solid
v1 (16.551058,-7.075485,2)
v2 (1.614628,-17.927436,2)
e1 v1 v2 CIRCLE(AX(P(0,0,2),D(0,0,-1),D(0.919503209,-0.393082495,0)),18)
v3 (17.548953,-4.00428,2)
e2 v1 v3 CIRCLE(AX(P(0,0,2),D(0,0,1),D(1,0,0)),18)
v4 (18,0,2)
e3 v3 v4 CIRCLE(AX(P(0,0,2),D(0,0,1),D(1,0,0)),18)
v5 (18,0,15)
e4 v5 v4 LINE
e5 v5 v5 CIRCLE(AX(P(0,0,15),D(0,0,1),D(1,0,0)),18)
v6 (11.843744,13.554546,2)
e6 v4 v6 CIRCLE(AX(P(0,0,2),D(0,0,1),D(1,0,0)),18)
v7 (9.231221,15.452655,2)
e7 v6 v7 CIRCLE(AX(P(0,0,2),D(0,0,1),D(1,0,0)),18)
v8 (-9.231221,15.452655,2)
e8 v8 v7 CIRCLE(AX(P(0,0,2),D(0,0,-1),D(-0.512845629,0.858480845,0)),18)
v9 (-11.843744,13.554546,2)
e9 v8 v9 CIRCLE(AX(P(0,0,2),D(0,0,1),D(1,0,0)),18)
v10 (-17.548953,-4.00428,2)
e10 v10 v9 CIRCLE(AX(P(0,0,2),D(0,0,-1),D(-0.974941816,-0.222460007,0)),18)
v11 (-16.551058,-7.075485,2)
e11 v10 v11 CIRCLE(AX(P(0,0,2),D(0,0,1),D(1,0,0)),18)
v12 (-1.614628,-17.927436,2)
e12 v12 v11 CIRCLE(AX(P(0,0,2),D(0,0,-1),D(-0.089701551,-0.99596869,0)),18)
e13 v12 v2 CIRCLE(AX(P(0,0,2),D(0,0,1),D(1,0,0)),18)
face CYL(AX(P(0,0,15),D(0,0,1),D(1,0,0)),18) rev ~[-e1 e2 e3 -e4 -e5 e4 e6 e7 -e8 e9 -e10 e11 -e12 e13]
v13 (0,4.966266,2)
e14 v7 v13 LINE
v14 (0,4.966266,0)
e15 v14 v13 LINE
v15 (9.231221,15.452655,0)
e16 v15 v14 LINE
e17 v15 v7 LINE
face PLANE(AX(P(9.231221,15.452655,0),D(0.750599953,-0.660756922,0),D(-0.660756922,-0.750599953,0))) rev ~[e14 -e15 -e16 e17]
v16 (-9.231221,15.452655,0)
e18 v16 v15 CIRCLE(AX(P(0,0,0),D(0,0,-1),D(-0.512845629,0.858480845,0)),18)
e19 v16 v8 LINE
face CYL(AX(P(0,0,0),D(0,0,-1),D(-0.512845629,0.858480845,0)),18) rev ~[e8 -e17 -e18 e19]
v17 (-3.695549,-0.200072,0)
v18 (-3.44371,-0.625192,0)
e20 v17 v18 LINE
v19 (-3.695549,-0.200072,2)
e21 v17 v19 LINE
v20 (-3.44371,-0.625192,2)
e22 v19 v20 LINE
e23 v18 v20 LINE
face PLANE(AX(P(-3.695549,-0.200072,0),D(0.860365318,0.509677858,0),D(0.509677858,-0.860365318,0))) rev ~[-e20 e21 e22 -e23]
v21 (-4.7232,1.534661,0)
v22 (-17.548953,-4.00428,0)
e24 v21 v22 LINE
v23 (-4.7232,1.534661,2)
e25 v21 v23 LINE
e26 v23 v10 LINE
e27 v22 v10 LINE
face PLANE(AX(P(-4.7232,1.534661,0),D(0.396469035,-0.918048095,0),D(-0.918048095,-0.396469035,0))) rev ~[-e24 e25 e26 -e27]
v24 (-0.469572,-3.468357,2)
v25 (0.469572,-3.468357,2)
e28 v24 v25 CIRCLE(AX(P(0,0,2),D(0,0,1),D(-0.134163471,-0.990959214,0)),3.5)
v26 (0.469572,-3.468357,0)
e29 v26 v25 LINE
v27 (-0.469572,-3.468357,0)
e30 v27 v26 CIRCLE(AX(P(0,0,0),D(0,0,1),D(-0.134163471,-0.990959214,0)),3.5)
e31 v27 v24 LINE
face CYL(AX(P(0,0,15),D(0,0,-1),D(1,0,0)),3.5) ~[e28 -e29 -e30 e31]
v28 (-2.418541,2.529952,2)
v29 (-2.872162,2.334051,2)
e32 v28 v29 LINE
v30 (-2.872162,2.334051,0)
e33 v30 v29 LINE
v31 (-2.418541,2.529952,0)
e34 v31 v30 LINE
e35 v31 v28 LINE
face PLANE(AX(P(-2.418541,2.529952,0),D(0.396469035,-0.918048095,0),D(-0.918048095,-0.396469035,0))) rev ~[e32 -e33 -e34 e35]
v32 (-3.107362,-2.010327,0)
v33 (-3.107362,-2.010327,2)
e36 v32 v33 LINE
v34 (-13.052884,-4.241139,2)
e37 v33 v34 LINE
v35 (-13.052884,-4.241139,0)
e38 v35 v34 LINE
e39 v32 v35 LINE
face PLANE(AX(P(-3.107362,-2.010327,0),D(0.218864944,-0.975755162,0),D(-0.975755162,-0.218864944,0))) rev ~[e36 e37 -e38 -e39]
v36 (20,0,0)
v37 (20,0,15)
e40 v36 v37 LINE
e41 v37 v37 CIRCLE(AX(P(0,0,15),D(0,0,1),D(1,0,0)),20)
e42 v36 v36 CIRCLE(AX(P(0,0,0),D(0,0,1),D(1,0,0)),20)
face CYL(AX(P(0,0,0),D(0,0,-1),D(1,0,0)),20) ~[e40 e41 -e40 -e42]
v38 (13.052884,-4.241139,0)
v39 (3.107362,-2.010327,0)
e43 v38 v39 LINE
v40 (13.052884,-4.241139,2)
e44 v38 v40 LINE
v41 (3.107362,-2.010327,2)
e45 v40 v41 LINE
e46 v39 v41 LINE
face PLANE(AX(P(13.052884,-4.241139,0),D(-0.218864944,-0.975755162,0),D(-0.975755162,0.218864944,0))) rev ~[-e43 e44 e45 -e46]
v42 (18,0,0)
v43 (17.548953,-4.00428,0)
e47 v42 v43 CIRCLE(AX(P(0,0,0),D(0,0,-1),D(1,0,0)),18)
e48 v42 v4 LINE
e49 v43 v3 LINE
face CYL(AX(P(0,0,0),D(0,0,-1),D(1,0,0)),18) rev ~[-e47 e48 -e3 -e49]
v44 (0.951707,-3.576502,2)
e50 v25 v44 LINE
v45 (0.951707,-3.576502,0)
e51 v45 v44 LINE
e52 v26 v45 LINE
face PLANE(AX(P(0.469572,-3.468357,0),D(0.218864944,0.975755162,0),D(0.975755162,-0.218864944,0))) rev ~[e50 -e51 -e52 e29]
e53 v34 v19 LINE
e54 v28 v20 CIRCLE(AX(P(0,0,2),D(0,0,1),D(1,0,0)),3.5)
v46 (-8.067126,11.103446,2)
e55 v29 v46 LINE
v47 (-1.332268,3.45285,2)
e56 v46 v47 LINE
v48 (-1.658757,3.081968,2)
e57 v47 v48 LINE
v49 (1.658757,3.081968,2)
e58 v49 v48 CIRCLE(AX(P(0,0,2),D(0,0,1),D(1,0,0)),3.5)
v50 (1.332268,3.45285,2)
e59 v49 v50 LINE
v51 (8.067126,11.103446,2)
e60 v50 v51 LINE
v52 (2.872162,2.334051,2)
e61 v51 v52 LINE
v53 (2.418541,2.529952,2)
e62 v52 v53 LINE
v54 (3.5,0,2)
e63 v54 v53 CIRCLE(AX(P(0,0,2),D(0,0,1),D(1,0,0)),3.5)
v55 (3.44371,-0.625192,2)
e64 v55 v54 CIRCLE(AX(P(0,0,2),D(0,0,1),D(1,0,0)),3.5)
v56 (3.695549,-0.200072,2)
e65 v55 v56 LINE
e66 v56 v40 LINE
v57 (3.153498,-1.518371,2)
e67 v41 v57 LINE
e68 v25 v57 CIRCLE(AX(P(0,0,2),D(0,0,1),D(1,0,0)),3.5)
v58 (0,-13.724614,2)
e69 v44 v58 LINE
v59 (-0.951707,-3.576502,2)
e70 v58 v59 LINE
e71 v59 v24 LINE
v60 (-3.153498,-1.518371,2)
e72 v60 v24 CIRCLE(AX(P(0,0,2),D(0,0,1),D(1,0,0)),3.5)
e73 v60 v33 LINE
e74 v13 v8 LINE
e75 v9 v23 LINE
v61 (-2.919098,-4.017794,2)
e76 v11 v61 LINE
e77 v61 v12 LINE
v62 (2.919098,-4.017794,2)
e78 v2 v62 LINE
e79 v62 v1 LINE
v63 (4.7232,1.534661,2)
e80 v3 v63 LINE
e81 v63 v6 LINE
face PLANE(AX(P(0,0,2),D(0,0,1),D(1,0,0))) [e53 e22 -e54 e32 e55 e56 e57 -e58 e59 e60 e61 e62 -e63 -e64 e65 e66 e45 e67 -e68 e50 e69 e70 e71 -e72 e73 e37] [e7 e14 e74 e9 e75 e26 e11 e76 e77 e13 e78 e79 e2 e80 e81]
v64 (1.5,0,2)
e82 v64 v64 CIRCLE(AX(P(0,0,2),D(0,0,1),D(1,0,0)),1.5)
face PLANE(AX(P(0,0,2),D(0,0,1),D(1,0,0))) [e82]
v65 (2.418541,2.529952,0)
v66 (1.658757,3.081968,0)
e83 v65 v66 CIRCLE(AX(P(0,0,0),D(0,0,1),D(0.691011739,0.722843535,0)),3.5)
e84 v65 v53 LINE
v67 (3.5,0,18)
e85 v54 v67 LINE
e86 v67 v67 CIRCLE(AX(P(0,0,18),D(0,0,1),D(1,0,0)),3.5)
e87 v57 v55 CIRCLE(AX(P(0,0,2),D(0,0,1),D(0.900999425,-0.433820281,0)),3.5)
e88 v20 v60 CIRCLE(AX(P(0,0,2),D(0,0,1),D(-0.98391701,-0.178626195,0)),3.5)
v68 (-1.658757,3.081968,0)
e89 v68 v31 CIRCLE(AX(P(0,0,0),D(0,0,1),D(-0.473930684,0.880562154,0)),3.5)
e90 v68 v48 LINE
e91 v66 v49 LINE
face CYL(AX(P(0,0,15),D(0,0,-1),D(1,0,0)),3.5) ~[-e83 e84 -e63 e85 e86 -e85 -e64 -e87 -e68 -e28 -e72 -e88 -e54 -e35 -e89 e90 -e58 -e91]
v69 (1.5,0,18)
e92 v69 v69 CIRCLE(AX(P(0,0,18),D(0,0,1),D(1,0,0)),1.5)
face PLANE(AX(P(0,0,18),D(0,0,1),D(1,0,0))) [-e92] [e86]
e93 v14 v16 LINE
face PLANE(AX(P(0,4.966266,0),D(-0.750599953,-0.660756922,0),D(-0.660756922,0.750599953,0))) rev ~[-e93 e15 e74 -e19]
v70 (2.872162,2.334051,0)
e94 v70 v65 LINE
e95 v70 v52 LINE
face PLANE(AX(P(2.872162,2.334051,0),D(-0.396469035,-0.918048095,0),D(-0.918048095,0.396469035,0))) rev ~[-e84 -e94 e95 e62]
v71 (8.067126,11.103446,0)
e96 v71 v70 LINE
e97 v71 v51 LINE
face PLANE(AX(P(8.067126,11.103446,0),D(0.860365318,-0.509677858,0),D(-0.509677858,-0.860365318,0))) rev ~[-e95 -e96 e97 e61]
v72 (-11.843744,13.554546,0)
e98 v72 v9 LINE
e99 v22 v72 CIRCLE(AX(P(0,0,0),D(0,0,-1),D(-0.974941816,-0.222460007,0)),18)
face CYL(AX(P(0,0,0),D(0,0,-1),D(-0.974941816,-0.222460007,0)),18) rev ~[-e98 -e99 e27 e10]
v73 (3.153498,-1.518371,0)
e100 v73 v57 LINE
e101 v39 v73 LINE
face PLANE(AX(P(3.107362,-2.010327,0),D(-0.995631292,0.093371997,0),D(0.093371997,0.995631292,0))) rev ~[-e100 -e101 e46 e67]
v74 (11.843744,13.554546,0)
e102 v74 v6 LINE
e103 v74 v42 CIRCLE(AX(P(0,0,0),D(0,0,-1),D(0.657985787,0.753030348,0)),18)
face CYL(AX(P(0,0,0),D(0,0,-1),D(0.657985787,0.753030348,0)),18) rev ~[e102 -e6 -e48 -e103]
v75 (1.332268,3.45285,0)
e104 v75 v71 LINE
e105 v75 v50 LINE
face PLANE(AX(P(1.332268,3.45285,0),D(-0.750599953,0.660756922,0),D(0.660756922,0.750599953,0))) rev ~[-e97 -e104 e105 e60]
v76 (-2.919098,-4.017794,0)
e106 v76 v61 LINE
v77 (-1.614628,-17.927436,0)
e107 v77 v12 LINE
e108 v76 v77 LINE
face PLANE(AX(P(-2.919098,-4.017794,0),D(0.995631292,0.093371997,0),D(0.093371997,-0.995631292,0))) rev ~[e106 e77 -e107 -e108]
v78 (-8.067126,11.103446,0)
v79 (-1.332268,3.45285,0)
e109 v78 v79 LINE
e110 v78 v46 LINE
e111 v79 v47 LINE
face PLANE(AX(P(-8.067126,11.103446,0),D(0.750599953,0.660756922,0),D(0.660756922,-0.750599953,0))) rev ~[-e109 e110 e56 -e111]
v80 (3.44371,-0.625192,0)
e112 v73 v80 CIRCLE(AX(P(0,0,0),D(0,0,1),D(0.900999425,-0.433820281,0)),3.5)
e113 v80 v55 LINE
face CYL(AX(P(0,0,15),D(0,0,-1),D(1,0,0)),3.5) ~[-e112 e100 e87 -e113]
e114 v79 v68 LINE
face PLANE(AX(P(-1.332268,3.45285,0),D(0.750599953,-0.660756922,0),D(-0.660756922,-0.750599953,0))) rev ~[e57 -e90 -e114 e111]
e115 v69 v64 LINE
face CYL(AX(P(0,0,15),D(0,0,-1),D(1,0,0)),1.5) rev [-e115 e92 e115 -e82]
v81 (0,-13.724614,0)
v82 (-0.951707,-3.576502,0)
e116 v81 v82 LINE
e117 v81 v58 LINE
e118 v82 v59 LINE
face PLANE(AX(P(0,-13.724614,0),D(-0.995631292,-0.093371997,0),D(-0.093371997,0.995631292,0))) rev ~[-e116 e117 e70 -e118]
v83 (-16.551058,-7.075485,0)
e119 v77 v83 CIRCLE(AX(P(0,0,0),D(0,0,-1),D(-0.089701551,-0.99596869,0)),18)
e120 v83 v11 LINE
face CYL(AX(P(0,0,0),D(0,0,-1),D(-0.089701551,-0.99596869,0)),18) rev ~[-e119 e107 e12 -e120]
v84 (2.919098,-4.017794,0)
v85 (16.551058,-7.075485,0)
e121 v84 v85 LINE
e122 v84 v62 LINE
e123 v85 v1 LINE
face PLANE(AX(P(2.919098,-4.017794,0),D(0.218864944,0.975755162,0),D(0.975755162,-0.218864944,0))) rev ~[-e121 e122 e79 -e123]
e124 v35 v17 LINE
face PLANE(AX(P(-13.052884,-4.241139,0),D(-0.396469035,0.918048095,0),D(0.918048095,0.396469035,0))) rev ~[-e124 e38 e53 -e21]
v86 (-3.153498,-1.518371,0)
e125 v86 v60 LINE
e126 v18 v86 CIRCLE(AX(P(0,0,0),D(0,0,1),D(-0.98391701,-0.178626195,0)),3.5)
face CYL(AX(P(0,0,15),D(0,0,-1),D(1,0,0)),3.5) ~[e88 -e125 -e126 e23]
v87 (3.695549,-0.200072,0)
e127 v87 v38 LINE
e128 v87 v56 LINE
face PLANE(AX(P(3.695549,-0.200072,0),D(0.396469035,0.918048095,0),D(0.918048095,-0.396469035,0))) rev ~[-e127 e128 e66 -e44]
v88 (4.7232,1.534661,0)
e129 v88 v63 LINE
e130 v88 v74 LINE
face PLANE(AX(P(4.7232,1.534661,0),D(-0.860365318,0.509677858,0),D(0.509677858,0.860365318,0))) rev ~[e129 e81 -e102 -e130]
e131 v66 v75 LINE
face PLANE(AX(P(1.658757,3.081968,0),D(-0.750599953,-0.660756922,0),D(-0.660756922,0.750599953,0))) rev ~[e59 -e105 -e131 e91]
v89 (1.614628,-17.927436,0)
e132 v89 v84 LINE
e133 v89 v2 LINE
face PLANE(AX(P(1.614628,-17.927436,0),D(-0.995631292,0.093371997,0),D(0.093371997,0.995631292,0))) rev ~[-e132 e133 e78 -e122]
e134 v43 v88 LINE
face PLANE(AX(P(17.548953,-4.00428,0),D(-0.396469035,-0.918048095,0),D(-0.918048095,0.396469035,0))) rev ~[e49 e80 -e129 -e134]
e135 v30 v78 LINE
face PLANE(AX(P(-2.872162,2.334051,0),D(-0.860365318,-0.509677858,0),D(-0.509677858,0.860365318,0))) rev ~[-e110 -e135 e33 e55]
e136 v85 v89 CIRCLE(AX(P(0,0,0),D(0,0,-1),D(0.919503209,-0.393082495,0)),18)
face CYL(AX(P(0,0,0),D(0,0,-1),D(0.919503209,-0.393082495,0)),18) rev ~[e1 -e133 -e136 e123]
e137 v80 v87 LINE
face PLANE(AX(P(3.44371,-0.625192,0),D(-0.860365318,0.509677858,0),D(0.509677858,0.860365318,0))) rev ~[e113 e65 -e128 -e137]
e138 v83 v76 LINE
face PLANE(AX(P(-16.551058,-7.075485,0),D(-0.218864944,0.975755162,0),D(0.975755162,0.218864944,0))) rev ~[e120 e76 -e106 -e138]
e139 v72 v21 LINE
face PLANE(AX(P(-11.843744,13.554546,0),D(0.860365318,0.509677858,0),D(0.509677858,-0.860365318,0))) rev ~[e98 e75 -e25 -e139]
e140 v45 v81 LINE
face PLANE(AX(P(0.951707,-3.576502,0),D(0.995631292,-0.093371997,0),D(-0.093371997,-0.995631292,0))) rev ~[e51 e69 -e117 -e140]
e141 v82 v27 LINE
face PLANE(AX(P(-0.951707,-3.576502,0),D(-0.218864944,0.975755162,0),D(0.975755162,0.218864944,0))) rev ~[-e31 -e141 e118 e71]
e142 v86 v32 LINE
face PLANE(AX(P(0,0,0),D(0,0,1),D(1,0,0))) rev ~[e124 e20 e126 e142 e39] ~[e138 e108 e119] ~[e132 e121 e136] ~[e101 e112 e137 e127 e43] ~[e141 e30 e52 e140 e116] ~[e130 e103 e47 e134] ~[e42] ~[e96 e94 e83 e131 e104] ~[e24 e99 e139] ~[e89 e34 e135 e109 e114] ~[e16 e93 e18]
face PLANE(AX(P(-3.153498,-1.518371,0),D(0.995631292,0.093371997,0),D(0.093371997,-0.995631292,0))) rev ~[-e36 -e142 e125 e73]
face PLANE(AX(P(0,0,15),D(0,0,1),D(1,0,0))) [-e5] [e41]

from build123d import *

# Parameters (mm, degrees)
F0_R      = 20
F1_DEPTH  = 15
F2_R      = 18
F3_DEPTH  = 13
F4_R      = 3.5
F4_R_2    = 1.5
F5_DEPTH  = 13
F6_R      = 3.5
F6_R_2    = 1.5
F7_DEPTH  = 3
F10_DEPTH = 2


with BuildPart() as f1:
    # F0 (on Top) → F1 (new body)
    with BuildSketch(Plane.XY):
        Circle(F0_R)
    extrude(amount=F1_DEPTH)

    # F2 (on face) → F3 (cut)
    with BuildSketch(Plane.XY.offset(15)):
        Circle(F2_R)
    extrude(amount=-F3_DEPTH, mode=Mode.SUBTRACT)

    # F4 (on face) → F5 (join)
    with BuildSketch(Plane.XY.offset(15)):
        Circle(F4_R)
        Circle(F4_R_2, mode=Mode.SUBTRACT)
    extrude(amount=-F5_DEPTH)

    # F6 (on face) → F7 (join)
    with BuildSketch(Plane.XY.offset(15)):
        Circle(F6_R)
        Circle(F6_R_2, mode=Mode.SUBTRACT)
    extrude(amount=F7_DEPTH)

    # F9 (on face) → F10 (cut)
    with BuildSketch(Plane(origin=(0, 0, 0), x_dir=(1, 0, 0), z_dir=(0, 0, -1))):
        with BuildLine():
            Line((-2.9190978863, 4.0177935548), (-1.6146279111, 17.9274364232))
            ThreePointArc((-1.6146279111, 17.9274364232), (-10.5801345413, 14.5623058987), (-16.5510577667, 7.0754849166))
            Line((-16.5510577667, 7.0754849166), (-2.9190978863, 4.0177935548))
        make_face()
        with BuildLine():
            ThreePointArc((-17.5489526949, 4.0042801241), (-17.1190172933, -5.5623058987), (-11.8437441606, -13.5545462579))
            Line((-11.8437441606, -13.5545462579), (-4.7231995965, -1.5346605781))
            Line((-4.7231995965, -1.5346605781), (-17.5489526949, 4.0042801241))
        make_face()
        with BuildLine():
            ThreePointArc((-9.2312213213, -15.452655206), (0, -18), (9.2312213213, -15.452655206))
            Line((9.2312213213, -15.452655206), (0, -4.9662659533))
            Line((0, -4.9662659533), (-9.2312213213, -15.452655206))
        make_face()
        with BuildLine():
            ThreePointArc((11.8437441606, -13.5545462579), (16.3888284342, -7.4435409957), (18, 0))
            ThreePointArc((18, 0), (17.8868827428, 2.0148016642), (17.5489526949, 4.0042801241))
            Line((17.5489526949, 4.0042801241), (4.7231995965, -1.5346605781))
            Line((4.7231995965, -1.5346605781), (11.8437441606, -13.5545462579))
        make_face()
        with BuildLine():
            Line((2.9190978863, 4.0177935548), (16.5510577667, 7.0754849166))
            ThreePointArc((16.5510577667, 7.0754849166), (10.5801345413, 14.5623058987), (1.6146279111, 17.9274364232))
            Line((1.6146279111, 17.9274364232), (2.9190978863, 4.0177935548))
        make_face()
        with BuildLine():
            Line((-1.3322676027, -3.4528501024), (-1.6587573928, -3.0819675391))
            ThreePointArc((-1.6587573928, -3.0819675391), (-2.057248383, -2.8315594803), (-2.4185410871, -2.5299523731))
            Line((-2.4185410871, -2.5299523731), (-2.8721622593, -2.3340511457))
            Line((-2.8721622593, -2.3340511457), (-8.0671256706, -11.1034459232))
            Line((-8.0671256706, -11.1034459232), (-1.3322676027, -3.4528501024))
        make_face()
        with BuildLine():
            Line((2.8721622593, -2.3340511457), (2.4185410871, -2.5299523731))
            ThreePointArc((2.4185410871, -2.5299523731), (2.057248383, -2.8315594803), (1.6587573928, -3.0819675391))
            Line((1.6587573928, -3.0819675391), (1.3322676027, -3.4528501024))
            Line((1.3322676027, -3.4528501024), (8.0671256706, -11.1034459232))
            Line((8.0671256706, -11.1034459232), (2.8721622593, -2.3340511457))
        make_face()
        with BuildLine():
            ThreePointArc((3.1534979878, 1.5183709826), (3.328697807, 1.0815594803), (3.443709535, 0.6251916817))
            Line((3.443709535, 0.6251916817), (3.6955489199, 0.2000724244))
            Line((3.6955489199, 0.2000724244), (13.0528835265, 4.2411389504))
            Line((13.0528835265, 4.2411389504), (3.1073615002, 2.0103271628))
            Line((3.1073615002, 2.0103271628), (3.1534979878, 1.5183709826))
        make_face()
        with BuildLine():
            ThreePointArc((-0.4695721472, 3.4683572478), (0, 3.5), (0.4695721472, 3.4683572478))
            Line((0.4695721472, 3.4683572478), (0.9517072369, 3.5765016608))
            Line((0.9517072369, 3.5765016608), (0, 13.7246139455))
            Line((0, 13.7246139455), (-0.9517072369, 3.5765016608))
            Line((-0.9517072369, 3.5765016608), (-0.4695721472, 3.4683572478))
        make_face()
        with BuildLine():
            ThreePointArc((-3.443709535, 0.6251916817), (-3.328697807, 1.0815594803), (-3.1534979878, 1.5183709826))
            Line((-3.1534979878, 1.5183709826), (-3.1073615002, 2.0103271628))
            Line((-3.1073615002, 2.0103271628), (-13.0528835265, 4.2411389504))
            Line((-13.0528835265, 4.2411389504), (-3.6955489199, 0.2000724244))
            Line((-3.6955489199, 0.2000724244), (-3.443709535, 0.6251916817))
        make_face()
    extrude(amount=-F10_DEPTH, mode=Mode.SUBTRACT)


solid = f1.part
